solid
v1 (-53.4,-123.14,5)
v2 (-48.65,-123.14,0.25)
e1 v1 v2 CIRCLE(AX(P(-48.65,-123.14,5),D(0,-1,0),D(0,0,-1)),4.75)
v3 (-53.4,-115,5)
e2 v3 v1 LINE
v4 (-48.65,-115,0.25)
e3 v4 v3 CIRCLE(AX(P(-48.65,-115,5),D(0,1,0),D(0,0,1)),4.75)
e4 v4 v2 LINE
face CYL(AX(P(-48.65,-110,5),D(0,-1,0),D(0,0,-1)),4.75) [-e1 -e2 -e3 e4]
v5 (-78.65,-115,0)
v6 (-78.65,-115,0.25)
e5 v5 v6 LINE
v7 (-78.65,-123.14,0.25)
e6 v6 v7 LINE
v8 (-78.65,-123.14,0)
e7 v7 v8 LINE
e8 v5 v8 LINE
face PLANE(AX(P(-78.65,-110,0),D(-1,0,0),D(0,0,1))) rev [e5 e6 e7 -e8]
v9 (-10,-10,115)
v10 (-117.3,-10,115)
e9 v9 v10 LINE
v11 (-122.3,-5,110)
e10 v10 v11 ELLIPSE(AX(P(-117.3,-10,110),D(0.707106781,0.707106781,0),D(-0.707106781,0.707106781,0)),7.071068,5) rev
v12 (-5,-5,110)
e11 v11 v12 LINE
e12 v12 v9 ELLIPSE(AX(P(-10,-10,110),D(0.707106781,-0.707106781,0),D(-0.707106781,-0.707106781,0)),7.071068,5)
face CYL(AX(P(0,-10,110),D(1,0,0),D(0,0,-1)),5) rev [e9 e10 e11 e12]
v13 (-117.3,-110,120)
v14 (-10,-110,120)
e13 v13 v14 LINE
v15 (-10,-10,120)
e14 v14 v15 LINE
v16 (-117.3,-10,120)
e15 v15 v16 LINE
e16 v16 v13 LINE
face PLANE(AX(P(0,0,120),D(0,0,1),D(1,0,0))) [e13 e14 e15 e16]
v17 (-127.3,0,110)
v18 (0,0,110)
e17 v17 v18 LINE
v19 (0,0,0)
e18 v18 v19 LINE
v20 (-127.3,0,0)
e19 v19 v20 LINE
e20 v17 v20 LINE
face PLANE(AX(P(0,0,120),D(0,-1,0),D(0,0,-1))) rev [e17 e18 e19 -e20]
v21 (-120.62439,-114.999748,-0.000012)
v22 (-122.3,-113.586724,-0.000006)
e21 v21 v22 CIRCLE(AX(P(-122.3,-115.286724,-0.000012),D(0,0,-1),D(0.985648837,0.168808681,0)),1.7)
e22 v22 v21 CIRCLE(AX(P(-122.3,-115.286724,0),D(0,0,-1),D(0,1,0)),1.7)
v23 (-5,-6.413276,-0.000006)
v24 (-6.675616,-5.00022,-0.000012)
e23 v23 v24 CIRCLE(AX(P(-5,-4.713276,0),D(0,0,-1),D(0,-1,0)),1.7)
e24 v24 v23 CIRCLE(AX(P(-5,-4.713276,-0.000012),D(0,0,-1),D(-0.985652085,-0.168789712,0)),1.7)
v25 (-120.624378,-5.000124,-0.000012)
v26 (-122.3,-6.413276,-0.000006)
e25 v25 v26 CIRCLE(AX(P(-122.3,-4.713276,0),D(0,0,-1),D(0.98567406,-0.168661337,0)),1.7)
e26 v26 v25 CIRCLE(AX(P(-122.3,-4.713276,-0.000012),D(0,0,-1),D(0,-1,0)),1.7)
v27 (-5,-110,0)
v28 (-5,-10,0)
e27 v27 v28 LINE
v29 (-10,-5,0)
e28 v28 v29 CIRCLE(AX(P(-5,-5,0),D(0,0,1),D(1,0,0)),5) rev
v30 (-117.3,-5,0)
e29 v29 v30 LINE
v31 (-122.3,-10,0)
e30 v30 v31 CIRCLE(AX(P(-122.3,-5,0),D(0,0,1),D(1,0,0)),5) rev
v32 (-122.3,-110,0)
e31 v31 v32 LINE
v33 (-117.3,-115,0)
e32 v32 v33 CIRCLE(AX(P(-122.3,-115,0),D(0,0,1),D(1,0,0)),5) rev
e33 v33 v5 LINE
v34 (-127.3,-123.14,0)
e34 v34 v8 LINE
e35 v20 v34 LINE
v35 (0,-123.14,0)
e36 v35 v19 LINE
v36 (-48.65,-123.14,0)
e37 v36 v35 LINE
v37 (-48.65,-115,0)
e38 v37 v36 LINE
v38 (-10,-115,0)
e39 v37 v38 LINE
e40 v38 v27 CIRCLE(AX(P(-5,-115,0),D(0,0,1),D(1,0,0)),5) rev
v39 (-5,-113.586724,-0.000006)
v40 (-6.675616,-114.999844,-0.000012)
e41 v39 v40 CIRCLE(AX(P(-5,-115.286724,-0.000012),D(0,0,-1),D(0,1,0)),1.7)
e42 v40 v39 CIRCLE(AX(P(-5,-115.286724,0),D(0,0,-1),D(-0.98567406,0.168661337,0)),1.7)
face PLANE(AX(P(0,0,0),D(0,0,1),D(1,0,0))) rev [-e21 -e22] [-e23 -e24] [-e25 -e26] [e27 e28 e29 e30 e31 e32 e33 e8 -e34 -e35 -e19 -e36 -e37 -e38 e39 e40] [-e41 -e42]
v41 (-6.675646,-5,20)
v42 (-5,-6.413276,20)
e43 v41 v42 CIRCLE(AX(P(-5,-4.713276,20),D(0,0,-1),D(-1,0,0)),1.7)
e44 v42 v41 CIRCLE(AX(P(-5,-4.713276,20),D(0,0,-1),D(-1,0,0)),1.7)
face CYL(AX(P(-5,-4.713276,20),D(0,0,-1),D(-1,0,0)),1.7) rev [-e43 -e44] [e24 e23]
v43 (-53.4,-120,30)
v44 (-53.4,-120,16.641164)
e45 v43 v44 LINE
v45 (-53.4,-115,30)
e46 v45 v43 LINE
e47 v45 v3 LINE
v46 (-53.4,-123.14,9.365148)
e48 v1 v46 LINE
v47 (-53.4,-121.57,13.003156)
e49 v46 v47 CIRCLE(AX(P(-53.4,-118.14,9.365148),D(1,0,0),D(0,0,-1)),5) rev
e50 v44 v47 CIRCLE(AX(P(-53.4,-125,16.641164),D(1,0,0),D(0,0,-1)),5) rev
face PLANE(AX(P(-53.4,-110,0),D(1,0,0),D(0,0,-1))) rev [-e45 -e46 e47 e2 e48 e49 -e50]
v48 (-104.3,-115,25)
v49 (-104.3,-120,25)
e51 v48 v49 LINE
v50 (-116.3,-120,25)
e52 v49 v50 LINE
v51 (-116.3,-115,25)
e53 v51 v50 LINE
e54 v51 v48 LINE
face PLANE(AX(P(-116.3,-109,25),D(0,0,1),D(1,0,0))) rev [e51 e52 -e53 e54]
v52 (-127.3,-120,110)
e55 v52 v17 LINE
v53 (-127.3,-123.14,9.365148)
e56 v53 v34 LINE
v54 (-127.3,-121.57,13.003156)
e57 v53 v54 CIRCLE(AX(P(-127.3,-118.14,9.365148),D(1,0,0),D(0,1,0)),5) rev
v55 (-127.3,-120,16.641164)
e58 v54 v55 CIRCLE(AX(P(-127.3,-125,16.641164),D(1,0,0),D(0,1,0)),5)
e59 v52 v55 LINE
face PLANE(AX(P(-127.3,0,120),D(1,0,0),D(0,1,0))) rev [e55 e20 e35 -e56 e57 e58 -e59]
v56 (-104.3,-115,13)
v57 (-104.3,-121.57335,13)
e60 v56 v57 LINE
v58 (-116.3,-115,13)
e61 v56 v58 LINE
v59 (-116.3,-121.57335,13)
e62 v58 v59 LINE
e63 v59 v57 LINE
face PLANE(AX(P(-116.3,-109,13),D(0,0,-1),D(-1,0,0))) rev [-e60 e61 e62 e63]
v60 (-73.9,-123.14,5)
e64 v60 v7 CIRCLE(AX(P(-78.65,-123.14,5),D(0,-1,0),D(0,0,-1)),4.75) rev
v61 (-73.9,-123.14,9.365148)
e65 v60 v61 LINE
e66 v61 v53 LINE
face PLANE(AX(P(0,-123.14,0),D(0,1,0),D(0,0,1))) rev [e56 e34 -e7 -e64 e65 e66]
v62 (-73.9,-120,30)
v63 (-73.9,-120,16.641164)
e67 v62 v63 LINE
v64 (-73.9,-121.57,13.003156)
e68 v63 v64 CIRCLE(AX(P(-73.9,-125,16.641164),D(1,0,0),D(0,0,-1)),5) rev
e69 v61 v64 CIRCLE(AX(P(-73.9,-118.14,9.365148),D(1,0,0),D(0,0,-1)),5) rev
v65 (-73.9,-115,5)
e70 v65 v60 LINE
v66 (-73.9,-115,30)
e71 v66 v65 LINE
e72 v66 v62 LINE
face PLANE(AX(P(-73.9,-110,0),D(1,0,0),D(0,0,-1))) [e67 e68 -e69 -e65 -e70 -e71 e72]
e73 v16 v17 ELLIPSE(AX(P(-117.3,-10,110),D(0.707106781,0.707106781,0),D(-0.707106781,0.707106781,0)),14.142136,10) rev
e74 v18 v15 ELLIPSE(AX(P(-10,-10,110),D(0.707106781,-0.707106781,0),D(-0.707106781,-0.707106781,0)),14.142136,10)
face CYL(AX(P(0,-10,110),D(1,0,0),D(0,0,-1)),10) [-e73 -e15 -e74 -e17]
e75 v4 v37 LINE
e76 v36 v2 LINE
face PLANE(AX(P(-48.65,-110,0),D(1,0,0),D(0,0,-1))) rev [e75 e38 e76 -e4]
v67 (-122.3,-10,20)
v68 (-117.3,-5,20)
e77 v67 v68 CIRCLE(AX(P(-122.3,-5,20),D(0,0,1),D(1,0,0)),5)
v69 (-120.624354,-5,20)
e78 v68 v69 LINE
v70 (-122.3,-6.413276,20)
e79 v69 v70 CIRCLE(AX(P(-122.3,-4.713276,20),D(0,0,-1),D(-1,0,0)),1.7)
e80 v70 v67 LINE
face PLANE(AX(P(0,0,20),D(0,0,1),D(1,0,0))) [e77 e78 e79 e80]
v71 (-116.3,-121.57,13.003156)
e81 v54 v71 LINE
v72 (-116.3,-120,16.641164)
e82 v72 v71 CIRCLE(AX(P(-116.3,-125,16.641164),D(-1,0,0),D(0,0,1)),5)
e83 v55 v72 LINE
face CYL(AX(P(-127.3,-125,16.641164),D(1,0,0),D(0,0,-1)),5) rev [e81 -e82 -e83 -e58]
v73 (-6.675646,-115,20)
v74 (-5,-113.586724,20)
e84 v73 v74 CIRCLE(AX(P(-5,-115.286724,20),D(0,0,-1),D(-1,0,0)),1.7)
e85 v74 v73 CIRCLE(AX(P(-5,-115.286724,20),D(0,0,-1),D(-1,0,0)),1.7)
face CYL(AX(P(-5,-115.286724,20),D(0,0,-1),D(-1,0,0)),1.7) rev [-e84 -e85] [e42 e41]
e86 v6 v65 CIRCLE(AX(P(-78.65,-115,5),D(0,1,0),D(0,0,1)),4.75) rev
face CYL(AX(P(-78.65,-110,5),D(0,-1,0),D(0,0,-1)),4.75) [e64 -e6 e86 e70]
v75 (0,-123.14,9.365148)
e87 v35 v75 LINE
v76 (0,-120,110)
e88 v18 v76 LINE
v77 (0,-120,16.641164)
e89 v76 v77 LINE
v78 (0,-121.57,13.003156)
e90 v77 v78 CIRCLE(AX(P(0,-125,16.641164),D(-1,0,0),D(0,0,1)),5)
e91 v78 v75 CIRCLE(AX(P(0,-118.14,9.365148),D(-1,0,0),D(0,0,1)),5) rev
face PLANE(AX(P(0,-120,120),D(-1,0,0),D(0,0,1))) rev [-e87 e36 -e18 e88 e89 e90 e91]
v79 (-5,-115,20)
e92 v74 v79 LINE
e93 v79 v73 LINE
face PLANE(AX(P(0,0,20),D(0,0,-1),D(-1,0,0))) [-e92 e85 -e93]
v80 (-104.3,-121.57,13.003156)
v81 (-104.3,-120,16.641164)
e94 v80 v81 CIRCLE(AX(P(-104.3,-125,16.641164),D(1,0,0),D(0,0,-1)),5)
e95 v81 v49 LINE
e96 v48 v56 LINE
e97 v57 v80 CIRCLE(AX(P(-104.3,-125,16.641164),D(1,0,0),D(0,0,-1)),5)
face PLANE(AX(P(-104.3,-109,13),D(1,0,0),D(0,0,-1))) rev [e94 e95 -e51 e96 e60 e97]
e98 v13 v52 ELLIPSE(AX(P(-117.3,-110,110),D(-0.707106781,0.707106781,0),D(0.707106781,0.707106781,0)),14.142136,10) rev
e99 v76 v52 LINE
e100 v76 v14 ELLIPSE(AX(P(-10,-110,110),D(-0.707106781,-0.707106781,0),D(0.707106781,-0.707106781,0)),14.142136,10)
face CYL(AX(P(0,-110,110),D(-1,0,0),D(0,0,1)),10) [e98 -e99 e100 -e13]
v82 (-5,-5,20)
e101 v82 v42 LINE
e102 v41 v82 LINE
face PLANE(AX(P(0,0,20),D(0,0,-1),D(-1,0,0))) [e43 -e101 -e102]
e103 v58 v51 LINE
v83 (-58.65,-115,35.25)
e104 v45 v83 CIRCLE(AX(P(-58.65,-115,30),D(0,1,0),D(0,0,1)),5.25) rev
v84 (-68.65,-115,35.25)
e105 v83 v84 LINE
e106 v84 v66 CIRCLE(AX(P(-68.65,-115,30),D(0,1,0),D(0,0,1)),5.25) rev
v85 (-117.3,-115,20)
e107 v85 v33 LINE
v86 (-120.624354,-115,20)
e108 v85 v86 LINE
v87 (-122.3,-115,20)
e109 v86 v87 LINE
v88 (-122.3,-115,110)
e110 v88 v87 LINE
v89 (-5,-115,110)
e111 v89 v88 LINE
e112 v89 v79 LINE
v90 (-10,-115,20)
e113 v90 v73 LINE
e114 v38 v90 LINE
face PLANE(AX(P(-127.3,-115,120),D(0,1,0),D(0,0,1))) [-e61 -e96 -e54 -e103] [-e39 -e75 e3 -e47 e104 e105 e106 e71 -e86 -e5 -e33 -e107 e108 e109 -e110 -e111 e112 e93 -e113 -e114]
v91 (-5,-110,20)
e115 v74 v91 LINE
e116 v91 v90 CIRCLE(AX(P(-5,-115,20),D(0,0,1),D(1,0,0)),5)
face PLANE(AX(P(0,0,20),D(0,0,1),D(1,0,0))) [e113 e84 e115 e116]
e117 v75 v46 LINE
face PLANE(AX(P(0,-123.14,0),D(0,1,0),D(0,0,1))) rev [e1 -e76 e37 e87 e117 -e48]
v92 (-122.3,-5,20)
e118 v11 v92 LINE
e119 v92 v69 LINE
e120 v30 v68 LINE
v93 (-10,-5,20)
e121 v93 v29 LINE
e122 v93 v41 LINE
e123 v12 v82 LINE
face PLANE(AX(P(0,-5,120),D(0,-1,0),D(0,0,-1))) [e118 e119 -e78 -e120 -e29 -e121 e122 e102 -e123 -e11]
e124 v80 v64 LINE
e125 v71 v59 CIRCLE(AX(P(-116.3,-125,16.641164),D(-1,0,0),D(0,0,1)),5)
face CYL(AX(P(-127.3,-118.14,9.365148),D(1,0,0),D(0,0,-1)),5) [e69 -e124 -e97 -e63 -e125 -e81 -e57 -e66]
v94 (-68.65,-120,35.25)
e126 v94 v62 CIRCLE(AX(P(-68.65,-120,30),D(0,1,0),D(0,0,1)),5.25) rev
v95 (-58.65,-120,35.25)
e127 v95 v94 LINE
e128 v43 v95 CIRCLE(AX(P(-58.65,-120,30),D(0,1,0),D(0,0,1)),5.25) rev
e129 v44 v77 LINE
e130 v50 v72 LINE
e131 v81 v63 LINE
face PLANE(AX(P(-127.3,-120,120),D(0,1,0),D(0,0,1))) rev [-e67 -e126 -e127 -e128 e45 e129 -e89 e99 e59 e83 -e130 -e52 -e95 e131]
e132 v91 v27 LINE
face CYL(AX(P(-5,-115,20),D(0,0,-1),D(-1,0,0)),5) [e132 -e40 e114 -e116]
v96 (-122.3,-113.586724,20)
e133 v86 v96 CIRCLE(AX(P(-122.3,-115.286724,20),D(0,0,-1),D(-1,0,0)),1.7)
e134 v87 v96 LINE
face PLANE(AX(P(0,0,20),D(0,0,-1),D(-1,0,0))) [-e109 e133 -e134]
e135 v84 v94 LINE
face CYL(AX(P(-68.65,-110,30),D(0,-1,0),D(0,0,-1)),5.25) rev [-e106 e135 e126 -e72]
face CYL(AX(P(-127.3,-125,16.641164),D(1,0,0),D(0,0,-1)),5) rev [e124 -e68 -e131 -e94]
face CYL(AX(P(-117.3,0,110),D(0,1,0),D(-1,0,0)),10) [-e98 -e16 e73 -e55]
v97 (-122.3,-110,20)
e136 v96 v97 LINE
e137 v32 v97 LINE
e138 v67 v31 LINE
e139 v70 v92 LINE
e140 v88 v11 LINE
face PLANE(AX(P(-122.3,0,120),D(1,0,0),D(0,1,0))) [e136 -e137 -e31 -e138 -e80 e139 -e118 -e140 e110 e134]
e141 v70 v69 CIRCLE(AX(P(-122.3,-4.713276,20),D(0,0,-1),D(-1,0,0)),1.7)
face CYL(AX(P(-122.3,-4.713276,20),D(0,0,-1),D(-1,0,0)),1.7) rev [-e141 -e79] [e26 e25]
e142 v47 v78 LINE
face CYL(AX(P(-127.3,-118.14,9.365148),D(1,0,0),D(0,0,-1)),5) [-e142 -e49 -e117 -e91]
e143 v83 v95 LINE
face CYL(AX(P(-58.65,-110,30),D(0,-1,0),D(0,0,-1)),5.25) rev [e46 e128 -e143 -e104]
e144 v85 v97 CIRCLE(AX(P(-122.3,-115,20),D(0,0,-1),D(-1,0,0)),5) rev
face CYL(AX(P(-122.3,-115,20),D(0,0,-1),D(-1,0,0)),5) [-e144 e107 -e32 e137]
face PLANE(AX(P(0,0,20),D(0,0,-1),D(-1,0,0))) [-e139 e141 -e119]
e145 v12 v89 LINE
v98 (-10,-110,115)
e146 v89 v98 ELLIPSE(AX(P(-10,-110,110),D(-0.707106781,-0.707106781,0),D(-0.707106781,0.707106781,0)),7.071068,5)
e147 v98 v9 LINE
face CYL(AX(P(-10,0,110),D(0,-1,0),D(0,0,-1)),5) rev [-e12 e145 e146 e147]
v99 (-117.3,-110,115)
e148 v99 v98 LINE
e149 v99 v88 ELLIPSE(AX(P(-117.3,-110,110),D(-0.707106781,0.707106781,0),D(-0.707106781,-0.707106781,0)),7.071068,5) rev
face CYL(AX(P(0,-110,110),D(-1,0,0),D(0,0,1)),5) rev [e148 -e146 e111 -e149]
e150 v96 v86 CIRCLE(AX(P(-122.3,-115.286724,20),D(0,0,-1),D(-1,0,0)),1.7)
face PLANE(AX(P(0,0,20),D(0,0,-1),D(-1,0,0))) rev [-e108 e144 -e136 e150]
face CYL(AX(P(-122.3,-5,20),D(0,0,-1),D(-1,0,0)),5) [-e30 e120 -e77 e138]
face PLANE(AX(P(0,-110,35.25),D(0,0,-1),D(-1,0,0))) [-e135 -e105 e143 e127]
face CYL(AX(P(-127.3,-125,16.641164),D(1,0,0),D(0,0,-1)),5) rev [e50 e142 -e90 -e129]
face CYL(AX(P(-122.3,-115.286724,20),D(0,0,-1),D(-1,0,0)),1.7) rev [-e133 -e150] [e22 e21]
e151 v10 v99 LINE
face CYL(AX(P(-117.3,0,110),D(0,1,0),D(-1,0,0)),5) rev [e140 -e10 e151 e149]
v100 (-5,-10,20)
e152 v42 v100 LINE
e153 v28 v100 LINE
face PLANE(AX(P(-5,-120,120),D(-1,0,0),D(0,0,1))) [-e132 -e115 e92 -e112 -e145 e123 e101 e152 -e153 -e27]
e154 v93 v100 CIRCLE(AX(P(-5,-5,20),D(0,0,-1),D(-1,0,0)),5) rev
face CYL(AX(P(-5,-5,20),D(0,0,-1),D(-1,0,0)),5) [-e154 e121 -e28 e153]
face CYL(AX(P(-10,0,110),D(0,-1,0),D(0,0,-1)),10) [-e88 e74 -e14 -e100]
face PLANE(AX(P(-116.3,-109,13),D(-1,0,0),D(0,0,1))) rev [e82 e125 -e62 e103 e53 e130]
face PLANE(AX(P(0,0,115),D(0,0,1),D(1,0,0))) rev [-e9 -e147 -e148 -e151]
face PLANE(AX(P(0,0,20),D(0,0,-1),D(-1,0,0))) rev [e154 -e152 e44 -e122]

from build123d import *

# Parameters (mm, degrees)
BOSS_EXTRUDE1_DEPTH     = 120
FILLET1_R               = 10
SHELL3_T                = -5
SKETCH3_R               = 1.7000000000000046
SKETCH3_R_2             = 1.6999999999999973
SKETCH3_R_3             = 1.6999999999999988
SKETCH3_R_4             = 1.7000000000000004
BOSS_EXTRUDE3_DEPTH     = 20
CUT_EXTRUDE1_DEPTH      = 213.14450263912096
CUT_EXTRUDE1_DEPTH_BACK = 20
SKETCH2_R               = 1.6999999999999973
SKETCH2_R_2             = 1.7000000000000024
SKETCH2_R_3             = 1.6999999999999988
SKETCH2_R_4             = 1.7000000000000004
FILLET5_R               = 5
SKETCH4_W               = 11.999999999999972
SKETCH4_H               = 11.999999999999998
CUT_EXTRUDE2_DEPTH      = 11.000000000000004
BOSS_EXTRUDE4_DEPTH     = 3.14
FILLET6_R               = 5
FILLET7_R               = 5
CUT_EXTRUDE3_DEPTH      = 13.140000000000002


# Some blends are built 0.0001 mm under size
with BuildPart() as part:
    # Sketch1 → Boss-Extrude1 (new body)
    with BuildSketch(Plane.XY):
        Polygon((0, 0), (-127.3, 0), (-127.29999999999997, -120.00000000000001), (0, -120.00000000000001), align=None)
    extrude(amount=BOSS_EXTRUDE1_DEPTH)

    # Fillet1
    fillet1_edges = [part.edges().sort_by_distance(p)[0] for p in [
        (-127.29999999999998, -60.00000000000001, 120),
        (-63.649999999999984, -120.00000000000001, 120),
        (0, -60.00000000000001, 120),
        (-63.65, 0, 120),
    ]]
    fillet(fillet1_edges, radius=FILLET1_R)

    # Shell3
    shell3_openings = [part.faces().sort_by_distance(p)[0] for p in [
        (-63.65, -60, 0),
    ]]
    offset(amount=SHELL3_T, openings=shell3_openings)

    # Sketch3 → Boss-Extrude3 (add)
    # profile 1 of 4: a face of its own
    with BuildSketch(Plane(origin=(0, 0, 0), x_dir=(-1, 0, 0), z_dir=(0, 0, -1))):
        Polygon((10.00000000000002, -110.00000000000004), (10.000000000000023, -120.00000000000006), (0, -120.00000000000003), (3.816e-14, -110.00000000000006), align=None)
        with Locations((5, -115.28672427337001)):
            Circle(SKETCH3_R, mode=Mode.SUBTRACT)
    # profile 2 of 4: a face of its own
    with BuildSketch(Plane(origin=(0, 0, 0), x_dir=(-1, 0, 0), z_dir=(0, 0, -1))):
        Polygon((117.30000000000004, -109.99999999999997), (117.30000000000007, -119.99999999999997), (127.29999999999997, -120.00000000000001), (127.30000000000005, -109.99999999999996), align=None)
        with Locations((122.3, -115.28672427337001)):
            Circle(SKETCH3_R_2, mode=Mode.SUBTRACT)
    # profile 3 of 4: a face of its own
    with BuildSketch(Plane(origin=(0, 0, 0), x_dir=(-1, 0, 0), z_dir=(0, 0, -1))):
        Polygon((127.3, -10.000000000000007), (117.30000000000001, -10.000000000000007), (117.30000000000001, -1.241e-14), (127.3, 0), align=None)
        with Locations((122.3, -4.713275726630009)):
            Circle(SKETCH3_R_3, mode=Mode.SUBTRACT)
    # profile 4 of 4: a face of its own
    with BuildSketch(Plane(origin=(0, 0, 0), x_dir=(-1, 0, 0), z_dir=(0, 0, -1))):
        Polygon((9.99999999999998, -10), (9.999999999999977, 0), (0, 0), (0, -10), align=None)
        with Locations((4.999999999999997, -4.713275726630009)):
            Circle(SKETCH3_R_4, mode=Mode.SUBTRACT)
    extrude(amount=-BOSS_EXTRUDE3_DEPTH)

    # Sketch2 → Cut-Extrude1 (cut, two sides: drawn at the far end of the back side and taken through both)
    with BuildSketch(Plane(origin=(0, 0, 0), x_dir=(-1, 0, 0), z_dir=(0, 0, -1)).offset(-CUT_EXTRUDE1_DEPTH_BACK)):
        with Locations(Location((122.3, -115.28672427337001, 0), (0, 0, 90))):
            Circle(SKETCH2_R)
        with Locations(Location((5, -115.28672427337001, 0), (0, 0, 90))):
            Circle(SKETCH2_R_2)
        with Locations(Location((122.3, -4.713275726630009, 0), (0, 0, 270))):
            Circle(SKETCH2_R_3)
        with Locations(Location((4.999999999999997, -4.713275726630009, 0), (0, 0, 270))):
            Circle(SKETCH2_R_4)
    extrude(amount=CUT_EXTRUDE1_DEPTH + CUT_EXTRUDE1_DEPTH_BACK, mode=Mode.SUBTRACT)

    # Fillet5
    fillet5_edges = [part.edges().sort_by_distance(p)[0] for p in [
        (-117.30000000000004, -109.99999999999997, 10),
        (-10.00000000000002, -110.00000000000004, 10),
        (-117.30000000000001, -10.000000000000007, 10),
        (-9.99999999999998, -10, 10),
    ]]
    fillet(fillet5_edges, radius=FILLET5_R - 0.0001)  # a hair under: the kernel refuses the full size

    # Sketch4 → Cut-Extrude2 (cut)
    with BuildSketch(Plane.XZ.offset(120.00000000000001)):
        with Locations((-110.29999999999995, 19.000000000000004)):
            Rectangle(SKETCH4_W, SKETCH4_H)
    extrude(amount=-CUT_EXTRUDE2_DEPTH, mode=Mode.SUBTRACT)

    # Sketch5 → Boss-Extrude4 (add)
    with BuildSketch(Plane.XZ.offset(120.00000000000001)):
        Polygon((-127.29999999999997, 0), (-127.29999999999997, 12), (0, 11.999999999999996), (0, 0), align=None)
    extrude(amount=BOSS_EXTRUDE4_DEPTH)

    # Fillet6
    # the kernel refuses this fillet: 5 mm, written as the material it adds along each edge
    with BuildSketch(Plane(origin=(-127.29999999999997, -120.00000000000001, 12), x_dir=(0, -1, 0), z_dir=(1, 0, -3e-17))) as fillet6_piece_1_section:
        with BuildLine():
            CenterArc((5, -4.6411636471902185), FILLET6_R, 111.83901544841774, 68.16098455158226)
            Line((0, -4.6411636471902185), (-0.09999999999999432, -4.6411636471902185))
            Line((-0.09999999999999432, -4.6411636471902185), (-0.09999999999999432, 0))
            Line((-0.09999999999999432, 0), (0, 0.09999999999999964))
            ThreePointArc((0, 0.09999999999999964), (1.5700000000000074, 0.09999999999999964), (3.102800000000002, 0.09282327294380366))
            Line((3.102800000000002, 0.09282327294380366), (3.1400000000000006, 0))
        make_face()
    fillet6_piece_1 = extrude(amount=127.29999999999997, mode=Mode.PRIVATE)
    fillet6_piece_1 = split(fillet6_piece_1, bisect_by=Plane(origin=(-116.29999999999995, -121.1633004902019, 12.387505999299782), z_dir=(-1, 0, 0)), keep=Keep.TOP, mode=Mode.PRIVATE)
    fillet6_piece_1 = split(fillet6_piece_1, bisect_by=Plane(origin=(-121.79999999999993, -121.1633004902019, 13.000000000000005), z_dir=(0, 0, -1)), keep=Keep.TOP, mode=Mode.PRIVATE)
    add(fillet6_piece_1)
    with BuildSketch(Plane(origin=(-127.29999999999997, -120.00000000000001, 12), x_dir=(0, -1, 0), z_dir=(1, 0, -3e-17))) as fillet6_piece_2_section:
        with BuildLine():
            CenterArc((5, -4.6411636471902185), FILLET6_R, 111.83901544841774, 68.16098455158226)
            Line((0, -4.6411636471902185), (-0.09999999999999432, -4.6411636471902185))
            Line((-0.09999999999999432, -4.6411636471902185), (-0.09999999999999432, 0))
            Line((-0.09999999999999432, 0), (0, 0.09999999999999964))
            ThreePointArc((0, 0.09999999999999964), (1.5700000000000074, 0.09999999999999964), (3.102800000000002, 0.09282327294380366))
            Line((3.102800000000002, 0.09282327294380366), (3.1400000000000006, 0))
        make_face()
    fillet6_piece_2 = extrude(amount=127.29999999999997, mode=Mode.PRIVATE)
    fillet6_piece_2 = split(fillet6_piece_2, bisect_by=Plane(origin=(-116.29999999999995, -120.36954878500708, 14.03973885667022), z_dir=(-1, 0, 0)), keep=Keep.TOP, mode=Mode.PRIVATE)
    fillet6_piece_2 = split(fillet6_piece_2, bisect_by=Plane(origin=(-121.79999999999998, -120.36954878500708, 13.000000000000005), z_dir=(0, 0, 1)), keep=Keep.TOP, mode=Mode.PRIVATE)
    add(fillet6_piece_2)
    with BuildSketch(Plane(origin=(-127.29999999999997, -120.00000000000001, 12), x_dir=(0, -1, 0), z_dir=(1, 0, -3e-17))) as fillet6_piece_3_section:
        with BuildLine():
            CenterArc((5, -4.6411636471902185), FILLET6_R, 111.83901544841774, 68.16098455158226)
            Line((0, -4.6411636471902185), (-0.09999999999999432, -4.6411636471902185))
            Line((-0.09999999999999432, -4.6411636471902185), (-0.09999999999999432, 0))
            Line((-0.09999999999999432, 0), (0, 0.09999999999999964))
            ThreePointArc((0, 0.09999999999999964), (1.5700000000000074, 0.09999999999999964), (3.102800000000002, 0.09282327294380366))
            Line((3.102800000000002, 0.09282327294380366), (3.1400000000000006, 0))
        make_face()
    fillet6_piece_3 = extrude(amount=127.29999999999997, mode=Mode.PRIVATE)
    fillet6_piece_3 = split(fillet6_piece_3, bisect_by=Plane(origin=(-116.29999999999995, -121.16330049020192, 12.387505999299782), z_dir=(1, 0, 0)), keep=Keep.TOP, mode=Mode.PRIVATE)
    fillet6_piece_3 = split(fillet6_piece_3, bisect_by=Plane(origin=(-110.29999999999997, -121.16330049020192, 13.000000000000005), z_dir=(0, 0, -1)), keep=Keep.TOP, mode=Mode.PRIVATE)
    fillet6_piece_3 = split(fillet6_piece_3, bisect_by=Plane(origin=(-104.29999999999997, -121.16330049020192, 12.387505999299782), z_dir=(-1, 0, 0)), keep=Keep.TOP, mode=Mode.PRIVATE)
    add(fillet6_piece_3)
    with BuildSketch(Plane(origin=(-127.29999999999997, -120.00000000000001, 12), x_dir=(0, -1, 0), z_dir=(1, 0, -3e-17))) as fillet6_piece_4_section:
        with BuildLine():
            CenterArc((5, -4.6411636471902185), FILLET6_R, 111.83901544841774, 68.16098455158226)
            Line((0, -4.6411636471902185), (-0.09999999999999432, -4.6411636471902185))
            Line((-0.09999999999999432, -4.6411636471902185), (-0.09999999999999432, 0))
            Line((-0.09999999999999432, 0), (0, 0.09999999999999964))
            ThreePointArc((0, 0.09999999999999964), (1.5700000000000074, 0.09999999999999964), (3.102800000000002, 0.09282327294380366))
            Line((3.102800000000002, 0.09282327294380366), (3.1400000000000006, 0))
        make_face()
    fillet6_piece_4 = extrude(amount=127.29999999999997, mode=Mode.PRIVATE)
    fillet6_piece_4 = split(fillet6_piece_4, bisect_by=Plane(origin=(-52.149999999999835, -121.16330049020192, 13.000000000000005), z_dir=(0, 0, -1)), keep=Keep.TOP, mode=Mode.PRIVATE)
    fillet6_piece_4 = split(fillet6_piece_4, bisect_by=Plane(origin=(-104.29999999999997, -121.16330049020192, 12.387505999299783), z_dir=(1, 0, 0)), keep=Keep.TOP, mode=Mode.PRIVATE)
    add(fillet6_piece_4)
    with BuildSketch(Plane(origin=(-127.29999999999997, -120.00000000000001, 12), x_dir=(0, -1, 0), z_dir=(1, 0, -3e-17))) as fillet6_piece_5_section:
        with BuildLine():
            CenterArc((5, -4.6411636471902185), FILLET6_R, 111.83901544841774, 68.16098455158226)
            Line((0, -4.6411636471902185), (-0.09999999999999432, -4.6411636471902185))
            Line((-0.09999999999999432, -4.6411636471902185), (-0.09999999999999432, 0))
            Line((-0.09999999999999432, 0), (0, 0.09999999999999964))
            ThreePointArc((0, 0.09999999999999964), (1.5700000000000074, 0.09999999999999964), (3.102800000000002, 0.09282327294380366))
            Line((3.102800000000002, 0.09282327294380366), (3.1400000000000006, 0))
        make_face()
    fillet6_piece_5 = extrude(amount=127.29999999999997, mode=Mode.PRIVATE)
    fillet6_piece_5 = split(fillet6_piece_5, bisect_by=Plane(origin=(-52.14999999999998, -120.36954878500707, 13.000000000000005), z_dir=(0, 0, 1)), keep=Keep.TOP, mode=Mode.PRIVATE)
    fillet6_piece_5 = split(fillet6_piece_5, bisect_by=Plane(origin=(-104.29999999999997, -120.36954878500707, 14.03973885667022), z_dir=(1, 0, 0)), keep=Keep.TOP, mode=Mode.PRIVATE)
    add(fillet6_piece_5)

    # Fillet7
    # the kernel refuses this fillet: 5 mm, written as the material it takes off along each edge
    with BuildSketch(Plane(origin=(-133.88712936466723, -123.14000000000001, 11.999999999999773), x_dir=(0, 0.8426718111972903, 0.5384275425844023), z_dir=(1, 0, -1e-17))) as fillet7_piece_1:
        with BuildLine():
            CenterArc((2.794682305385189, -4.912453005847793), FILLET7_R, 100.73764343311844, 46.68569768534586)
            Line((-1.4186767506012903, -2.2203152929258243), (0, 0))
            ThreePointArc((0, 0), (0.93156076846174, -0.08754699415221018), (1.8631215369234693, -9e-17))
        make_face()
    extrude(amount=140.47425872933445, mode=Mode.SUBTRACT)

    # Sketch6 → Cut-Extrude3 (cut)
    with BuildSketch(Plane.XZ.offset(123.14000000000001)):
        with BuildLine():
            Line((-78.64999999999999, -2.6e-15), (-73.64999999999999, -2.17e-15))
            Line((-73.64999999999999, -2.01e-15), (-53.65, 0))
            Line((-53.65, -4.3e-16), (-48.65, 0))
            ThreePointArc((-48.65, 8.9e-16), (-52.185533905932736, 1.4644660940672627), (-53.65, 5))
            Line((-53.65, 5), (-53.65, 9.365148254133372))
            Line((-53.65, 9.365148254133372), (-73.64999999999999, 9.365148254133372))
            Line((-73.64999999999999, 9.365148254133372), (-73.64999999999999, 4.999999999999997))
            ThreePointArc((-73.64999999999999, 4.999999999999997), (-75.11446609406725, 1.4644660940672605), (-78.64999999999999, -1.78e-15))
        make_face()
        with BuildLine():
            Line((-73.64999999999999, 30.000000000000004), (-73.64999999999999, 9.365148254133372))
            Line((-73.64999999999999, 9.365148254133372), (-53.65, 9.365148254133372))
            Line((-53.65, 9.365148254133372), (-53.65, 30.000000000000007))
            ThreePointArc((-53.65, 30.000000000000004), (-55.114466094067254, 33.53553390593274), (-58.64999999999999, 35))
            Line((-58.64999999999999, 35), (-68.64999999999999, 35))
            ThreePointArc((-68.64999999999999, 35), (-72.18553390593273, 33.53553390593274), (-73.64999999999999, 30.000000000000004))
        make_face()
        with BuildLine():
            Line((-73.89999999999999, 9.365148254133372), (-73.64999999999999, 9.365148254133372))
            Line((-73.64999999999999, 9.365148254133372), (-73.64999999999999, 30.000000000000004))
            ThreePointArc((-73.64999999999999, 30.000000000000004), (-72.18553390593273, 33.53553390593274), (-68.64999999999999, 35))
            Line((-68.64999999999999, 35), (-58.64999999999999, 35))
            ThreePointArc((-58.64999999999999, 35), (-55.114466094067254, 33.53553390593274), (-53.65, 30.000000000000004))
            Line((-53.65, 30.000000000000007), (-53.65, 9.365148254133372))
            Line((-53.65, 9.365148254133372), (-53.4, 9.365148254133372))
            Line((-53.4, 9.365148254133372), (-53.4, 30.000000000000004))
            ThreePointArc((-53.4, 30.000000000000004), (-54.93768939877062, 33.712310601229376), (-58.64999999999999, 35.25))
            Line((-58.64999999999999, 35.25), (-68.64999999999999, 35.25))
            ThreePointArc((-68.64999999999999, 35.25), (-72.36231060122937, 33.712310601229376), (-73.89999999999999, 30.000000000000004))
            Line((-73.89999999999999, 30.000000000000004), (-73.89999999999999, 9.365148254133372))
        make_face()
        with BuildLine():
            ThreePointArc((-53.65, 5), (-52.185533905932736, 1.4644660940672627), (-48.65, 8.9e-16))
            Line((-48.65, 0), (-48.65, 0.25000000000000455))
            ThreePointArc((-48.65, 0.2500000000000062), (-52.0087572106361, 1.6412427893639014), (-53.4, 5.000000000000001))
            Line((-53.4, 5.000000000000001), (-53.4, 9.365148254133372))
            Line((-53.4, 9.365148254133372), (-53.65, 9.365148254133372))
            Line((-53.65, 9.365148254133372), (-53.65, 5))
        make_face()
        with BuildLine():
            Line((-78.64999999999999, 0.249999999999995), (-78.64999999999999, -2.61e-15))
            ThreePointArc((-78.64999999999999, -1.78e-15), (-75.11446609406725, 1.4644660940672605), (-73.64999999999999, 4.999999999999997))
            Line((-73.64999999999999, 4.999999999999997), (-73.64999999999999, 9.365148254133372))
            Line((-73.64999999999999, 9.365148254133372), (-73.89999999999999, 9.365148254133372))
            Line((-73.89999999999999, 9.365148254133372), (-73.89999999999999, 4.999999999999997))
            ThreePointArc((-73.89999999999999, 4.999999999999997), (-75.29124278936389, 1.641242789363897), (-78.64999999999999, 0.24999999999999112))
        make_face()
    extrude(amount=-CUT_EXTRUDE3_DEPTH, mode=Mode.SUBTRACT)


solid = part.part
